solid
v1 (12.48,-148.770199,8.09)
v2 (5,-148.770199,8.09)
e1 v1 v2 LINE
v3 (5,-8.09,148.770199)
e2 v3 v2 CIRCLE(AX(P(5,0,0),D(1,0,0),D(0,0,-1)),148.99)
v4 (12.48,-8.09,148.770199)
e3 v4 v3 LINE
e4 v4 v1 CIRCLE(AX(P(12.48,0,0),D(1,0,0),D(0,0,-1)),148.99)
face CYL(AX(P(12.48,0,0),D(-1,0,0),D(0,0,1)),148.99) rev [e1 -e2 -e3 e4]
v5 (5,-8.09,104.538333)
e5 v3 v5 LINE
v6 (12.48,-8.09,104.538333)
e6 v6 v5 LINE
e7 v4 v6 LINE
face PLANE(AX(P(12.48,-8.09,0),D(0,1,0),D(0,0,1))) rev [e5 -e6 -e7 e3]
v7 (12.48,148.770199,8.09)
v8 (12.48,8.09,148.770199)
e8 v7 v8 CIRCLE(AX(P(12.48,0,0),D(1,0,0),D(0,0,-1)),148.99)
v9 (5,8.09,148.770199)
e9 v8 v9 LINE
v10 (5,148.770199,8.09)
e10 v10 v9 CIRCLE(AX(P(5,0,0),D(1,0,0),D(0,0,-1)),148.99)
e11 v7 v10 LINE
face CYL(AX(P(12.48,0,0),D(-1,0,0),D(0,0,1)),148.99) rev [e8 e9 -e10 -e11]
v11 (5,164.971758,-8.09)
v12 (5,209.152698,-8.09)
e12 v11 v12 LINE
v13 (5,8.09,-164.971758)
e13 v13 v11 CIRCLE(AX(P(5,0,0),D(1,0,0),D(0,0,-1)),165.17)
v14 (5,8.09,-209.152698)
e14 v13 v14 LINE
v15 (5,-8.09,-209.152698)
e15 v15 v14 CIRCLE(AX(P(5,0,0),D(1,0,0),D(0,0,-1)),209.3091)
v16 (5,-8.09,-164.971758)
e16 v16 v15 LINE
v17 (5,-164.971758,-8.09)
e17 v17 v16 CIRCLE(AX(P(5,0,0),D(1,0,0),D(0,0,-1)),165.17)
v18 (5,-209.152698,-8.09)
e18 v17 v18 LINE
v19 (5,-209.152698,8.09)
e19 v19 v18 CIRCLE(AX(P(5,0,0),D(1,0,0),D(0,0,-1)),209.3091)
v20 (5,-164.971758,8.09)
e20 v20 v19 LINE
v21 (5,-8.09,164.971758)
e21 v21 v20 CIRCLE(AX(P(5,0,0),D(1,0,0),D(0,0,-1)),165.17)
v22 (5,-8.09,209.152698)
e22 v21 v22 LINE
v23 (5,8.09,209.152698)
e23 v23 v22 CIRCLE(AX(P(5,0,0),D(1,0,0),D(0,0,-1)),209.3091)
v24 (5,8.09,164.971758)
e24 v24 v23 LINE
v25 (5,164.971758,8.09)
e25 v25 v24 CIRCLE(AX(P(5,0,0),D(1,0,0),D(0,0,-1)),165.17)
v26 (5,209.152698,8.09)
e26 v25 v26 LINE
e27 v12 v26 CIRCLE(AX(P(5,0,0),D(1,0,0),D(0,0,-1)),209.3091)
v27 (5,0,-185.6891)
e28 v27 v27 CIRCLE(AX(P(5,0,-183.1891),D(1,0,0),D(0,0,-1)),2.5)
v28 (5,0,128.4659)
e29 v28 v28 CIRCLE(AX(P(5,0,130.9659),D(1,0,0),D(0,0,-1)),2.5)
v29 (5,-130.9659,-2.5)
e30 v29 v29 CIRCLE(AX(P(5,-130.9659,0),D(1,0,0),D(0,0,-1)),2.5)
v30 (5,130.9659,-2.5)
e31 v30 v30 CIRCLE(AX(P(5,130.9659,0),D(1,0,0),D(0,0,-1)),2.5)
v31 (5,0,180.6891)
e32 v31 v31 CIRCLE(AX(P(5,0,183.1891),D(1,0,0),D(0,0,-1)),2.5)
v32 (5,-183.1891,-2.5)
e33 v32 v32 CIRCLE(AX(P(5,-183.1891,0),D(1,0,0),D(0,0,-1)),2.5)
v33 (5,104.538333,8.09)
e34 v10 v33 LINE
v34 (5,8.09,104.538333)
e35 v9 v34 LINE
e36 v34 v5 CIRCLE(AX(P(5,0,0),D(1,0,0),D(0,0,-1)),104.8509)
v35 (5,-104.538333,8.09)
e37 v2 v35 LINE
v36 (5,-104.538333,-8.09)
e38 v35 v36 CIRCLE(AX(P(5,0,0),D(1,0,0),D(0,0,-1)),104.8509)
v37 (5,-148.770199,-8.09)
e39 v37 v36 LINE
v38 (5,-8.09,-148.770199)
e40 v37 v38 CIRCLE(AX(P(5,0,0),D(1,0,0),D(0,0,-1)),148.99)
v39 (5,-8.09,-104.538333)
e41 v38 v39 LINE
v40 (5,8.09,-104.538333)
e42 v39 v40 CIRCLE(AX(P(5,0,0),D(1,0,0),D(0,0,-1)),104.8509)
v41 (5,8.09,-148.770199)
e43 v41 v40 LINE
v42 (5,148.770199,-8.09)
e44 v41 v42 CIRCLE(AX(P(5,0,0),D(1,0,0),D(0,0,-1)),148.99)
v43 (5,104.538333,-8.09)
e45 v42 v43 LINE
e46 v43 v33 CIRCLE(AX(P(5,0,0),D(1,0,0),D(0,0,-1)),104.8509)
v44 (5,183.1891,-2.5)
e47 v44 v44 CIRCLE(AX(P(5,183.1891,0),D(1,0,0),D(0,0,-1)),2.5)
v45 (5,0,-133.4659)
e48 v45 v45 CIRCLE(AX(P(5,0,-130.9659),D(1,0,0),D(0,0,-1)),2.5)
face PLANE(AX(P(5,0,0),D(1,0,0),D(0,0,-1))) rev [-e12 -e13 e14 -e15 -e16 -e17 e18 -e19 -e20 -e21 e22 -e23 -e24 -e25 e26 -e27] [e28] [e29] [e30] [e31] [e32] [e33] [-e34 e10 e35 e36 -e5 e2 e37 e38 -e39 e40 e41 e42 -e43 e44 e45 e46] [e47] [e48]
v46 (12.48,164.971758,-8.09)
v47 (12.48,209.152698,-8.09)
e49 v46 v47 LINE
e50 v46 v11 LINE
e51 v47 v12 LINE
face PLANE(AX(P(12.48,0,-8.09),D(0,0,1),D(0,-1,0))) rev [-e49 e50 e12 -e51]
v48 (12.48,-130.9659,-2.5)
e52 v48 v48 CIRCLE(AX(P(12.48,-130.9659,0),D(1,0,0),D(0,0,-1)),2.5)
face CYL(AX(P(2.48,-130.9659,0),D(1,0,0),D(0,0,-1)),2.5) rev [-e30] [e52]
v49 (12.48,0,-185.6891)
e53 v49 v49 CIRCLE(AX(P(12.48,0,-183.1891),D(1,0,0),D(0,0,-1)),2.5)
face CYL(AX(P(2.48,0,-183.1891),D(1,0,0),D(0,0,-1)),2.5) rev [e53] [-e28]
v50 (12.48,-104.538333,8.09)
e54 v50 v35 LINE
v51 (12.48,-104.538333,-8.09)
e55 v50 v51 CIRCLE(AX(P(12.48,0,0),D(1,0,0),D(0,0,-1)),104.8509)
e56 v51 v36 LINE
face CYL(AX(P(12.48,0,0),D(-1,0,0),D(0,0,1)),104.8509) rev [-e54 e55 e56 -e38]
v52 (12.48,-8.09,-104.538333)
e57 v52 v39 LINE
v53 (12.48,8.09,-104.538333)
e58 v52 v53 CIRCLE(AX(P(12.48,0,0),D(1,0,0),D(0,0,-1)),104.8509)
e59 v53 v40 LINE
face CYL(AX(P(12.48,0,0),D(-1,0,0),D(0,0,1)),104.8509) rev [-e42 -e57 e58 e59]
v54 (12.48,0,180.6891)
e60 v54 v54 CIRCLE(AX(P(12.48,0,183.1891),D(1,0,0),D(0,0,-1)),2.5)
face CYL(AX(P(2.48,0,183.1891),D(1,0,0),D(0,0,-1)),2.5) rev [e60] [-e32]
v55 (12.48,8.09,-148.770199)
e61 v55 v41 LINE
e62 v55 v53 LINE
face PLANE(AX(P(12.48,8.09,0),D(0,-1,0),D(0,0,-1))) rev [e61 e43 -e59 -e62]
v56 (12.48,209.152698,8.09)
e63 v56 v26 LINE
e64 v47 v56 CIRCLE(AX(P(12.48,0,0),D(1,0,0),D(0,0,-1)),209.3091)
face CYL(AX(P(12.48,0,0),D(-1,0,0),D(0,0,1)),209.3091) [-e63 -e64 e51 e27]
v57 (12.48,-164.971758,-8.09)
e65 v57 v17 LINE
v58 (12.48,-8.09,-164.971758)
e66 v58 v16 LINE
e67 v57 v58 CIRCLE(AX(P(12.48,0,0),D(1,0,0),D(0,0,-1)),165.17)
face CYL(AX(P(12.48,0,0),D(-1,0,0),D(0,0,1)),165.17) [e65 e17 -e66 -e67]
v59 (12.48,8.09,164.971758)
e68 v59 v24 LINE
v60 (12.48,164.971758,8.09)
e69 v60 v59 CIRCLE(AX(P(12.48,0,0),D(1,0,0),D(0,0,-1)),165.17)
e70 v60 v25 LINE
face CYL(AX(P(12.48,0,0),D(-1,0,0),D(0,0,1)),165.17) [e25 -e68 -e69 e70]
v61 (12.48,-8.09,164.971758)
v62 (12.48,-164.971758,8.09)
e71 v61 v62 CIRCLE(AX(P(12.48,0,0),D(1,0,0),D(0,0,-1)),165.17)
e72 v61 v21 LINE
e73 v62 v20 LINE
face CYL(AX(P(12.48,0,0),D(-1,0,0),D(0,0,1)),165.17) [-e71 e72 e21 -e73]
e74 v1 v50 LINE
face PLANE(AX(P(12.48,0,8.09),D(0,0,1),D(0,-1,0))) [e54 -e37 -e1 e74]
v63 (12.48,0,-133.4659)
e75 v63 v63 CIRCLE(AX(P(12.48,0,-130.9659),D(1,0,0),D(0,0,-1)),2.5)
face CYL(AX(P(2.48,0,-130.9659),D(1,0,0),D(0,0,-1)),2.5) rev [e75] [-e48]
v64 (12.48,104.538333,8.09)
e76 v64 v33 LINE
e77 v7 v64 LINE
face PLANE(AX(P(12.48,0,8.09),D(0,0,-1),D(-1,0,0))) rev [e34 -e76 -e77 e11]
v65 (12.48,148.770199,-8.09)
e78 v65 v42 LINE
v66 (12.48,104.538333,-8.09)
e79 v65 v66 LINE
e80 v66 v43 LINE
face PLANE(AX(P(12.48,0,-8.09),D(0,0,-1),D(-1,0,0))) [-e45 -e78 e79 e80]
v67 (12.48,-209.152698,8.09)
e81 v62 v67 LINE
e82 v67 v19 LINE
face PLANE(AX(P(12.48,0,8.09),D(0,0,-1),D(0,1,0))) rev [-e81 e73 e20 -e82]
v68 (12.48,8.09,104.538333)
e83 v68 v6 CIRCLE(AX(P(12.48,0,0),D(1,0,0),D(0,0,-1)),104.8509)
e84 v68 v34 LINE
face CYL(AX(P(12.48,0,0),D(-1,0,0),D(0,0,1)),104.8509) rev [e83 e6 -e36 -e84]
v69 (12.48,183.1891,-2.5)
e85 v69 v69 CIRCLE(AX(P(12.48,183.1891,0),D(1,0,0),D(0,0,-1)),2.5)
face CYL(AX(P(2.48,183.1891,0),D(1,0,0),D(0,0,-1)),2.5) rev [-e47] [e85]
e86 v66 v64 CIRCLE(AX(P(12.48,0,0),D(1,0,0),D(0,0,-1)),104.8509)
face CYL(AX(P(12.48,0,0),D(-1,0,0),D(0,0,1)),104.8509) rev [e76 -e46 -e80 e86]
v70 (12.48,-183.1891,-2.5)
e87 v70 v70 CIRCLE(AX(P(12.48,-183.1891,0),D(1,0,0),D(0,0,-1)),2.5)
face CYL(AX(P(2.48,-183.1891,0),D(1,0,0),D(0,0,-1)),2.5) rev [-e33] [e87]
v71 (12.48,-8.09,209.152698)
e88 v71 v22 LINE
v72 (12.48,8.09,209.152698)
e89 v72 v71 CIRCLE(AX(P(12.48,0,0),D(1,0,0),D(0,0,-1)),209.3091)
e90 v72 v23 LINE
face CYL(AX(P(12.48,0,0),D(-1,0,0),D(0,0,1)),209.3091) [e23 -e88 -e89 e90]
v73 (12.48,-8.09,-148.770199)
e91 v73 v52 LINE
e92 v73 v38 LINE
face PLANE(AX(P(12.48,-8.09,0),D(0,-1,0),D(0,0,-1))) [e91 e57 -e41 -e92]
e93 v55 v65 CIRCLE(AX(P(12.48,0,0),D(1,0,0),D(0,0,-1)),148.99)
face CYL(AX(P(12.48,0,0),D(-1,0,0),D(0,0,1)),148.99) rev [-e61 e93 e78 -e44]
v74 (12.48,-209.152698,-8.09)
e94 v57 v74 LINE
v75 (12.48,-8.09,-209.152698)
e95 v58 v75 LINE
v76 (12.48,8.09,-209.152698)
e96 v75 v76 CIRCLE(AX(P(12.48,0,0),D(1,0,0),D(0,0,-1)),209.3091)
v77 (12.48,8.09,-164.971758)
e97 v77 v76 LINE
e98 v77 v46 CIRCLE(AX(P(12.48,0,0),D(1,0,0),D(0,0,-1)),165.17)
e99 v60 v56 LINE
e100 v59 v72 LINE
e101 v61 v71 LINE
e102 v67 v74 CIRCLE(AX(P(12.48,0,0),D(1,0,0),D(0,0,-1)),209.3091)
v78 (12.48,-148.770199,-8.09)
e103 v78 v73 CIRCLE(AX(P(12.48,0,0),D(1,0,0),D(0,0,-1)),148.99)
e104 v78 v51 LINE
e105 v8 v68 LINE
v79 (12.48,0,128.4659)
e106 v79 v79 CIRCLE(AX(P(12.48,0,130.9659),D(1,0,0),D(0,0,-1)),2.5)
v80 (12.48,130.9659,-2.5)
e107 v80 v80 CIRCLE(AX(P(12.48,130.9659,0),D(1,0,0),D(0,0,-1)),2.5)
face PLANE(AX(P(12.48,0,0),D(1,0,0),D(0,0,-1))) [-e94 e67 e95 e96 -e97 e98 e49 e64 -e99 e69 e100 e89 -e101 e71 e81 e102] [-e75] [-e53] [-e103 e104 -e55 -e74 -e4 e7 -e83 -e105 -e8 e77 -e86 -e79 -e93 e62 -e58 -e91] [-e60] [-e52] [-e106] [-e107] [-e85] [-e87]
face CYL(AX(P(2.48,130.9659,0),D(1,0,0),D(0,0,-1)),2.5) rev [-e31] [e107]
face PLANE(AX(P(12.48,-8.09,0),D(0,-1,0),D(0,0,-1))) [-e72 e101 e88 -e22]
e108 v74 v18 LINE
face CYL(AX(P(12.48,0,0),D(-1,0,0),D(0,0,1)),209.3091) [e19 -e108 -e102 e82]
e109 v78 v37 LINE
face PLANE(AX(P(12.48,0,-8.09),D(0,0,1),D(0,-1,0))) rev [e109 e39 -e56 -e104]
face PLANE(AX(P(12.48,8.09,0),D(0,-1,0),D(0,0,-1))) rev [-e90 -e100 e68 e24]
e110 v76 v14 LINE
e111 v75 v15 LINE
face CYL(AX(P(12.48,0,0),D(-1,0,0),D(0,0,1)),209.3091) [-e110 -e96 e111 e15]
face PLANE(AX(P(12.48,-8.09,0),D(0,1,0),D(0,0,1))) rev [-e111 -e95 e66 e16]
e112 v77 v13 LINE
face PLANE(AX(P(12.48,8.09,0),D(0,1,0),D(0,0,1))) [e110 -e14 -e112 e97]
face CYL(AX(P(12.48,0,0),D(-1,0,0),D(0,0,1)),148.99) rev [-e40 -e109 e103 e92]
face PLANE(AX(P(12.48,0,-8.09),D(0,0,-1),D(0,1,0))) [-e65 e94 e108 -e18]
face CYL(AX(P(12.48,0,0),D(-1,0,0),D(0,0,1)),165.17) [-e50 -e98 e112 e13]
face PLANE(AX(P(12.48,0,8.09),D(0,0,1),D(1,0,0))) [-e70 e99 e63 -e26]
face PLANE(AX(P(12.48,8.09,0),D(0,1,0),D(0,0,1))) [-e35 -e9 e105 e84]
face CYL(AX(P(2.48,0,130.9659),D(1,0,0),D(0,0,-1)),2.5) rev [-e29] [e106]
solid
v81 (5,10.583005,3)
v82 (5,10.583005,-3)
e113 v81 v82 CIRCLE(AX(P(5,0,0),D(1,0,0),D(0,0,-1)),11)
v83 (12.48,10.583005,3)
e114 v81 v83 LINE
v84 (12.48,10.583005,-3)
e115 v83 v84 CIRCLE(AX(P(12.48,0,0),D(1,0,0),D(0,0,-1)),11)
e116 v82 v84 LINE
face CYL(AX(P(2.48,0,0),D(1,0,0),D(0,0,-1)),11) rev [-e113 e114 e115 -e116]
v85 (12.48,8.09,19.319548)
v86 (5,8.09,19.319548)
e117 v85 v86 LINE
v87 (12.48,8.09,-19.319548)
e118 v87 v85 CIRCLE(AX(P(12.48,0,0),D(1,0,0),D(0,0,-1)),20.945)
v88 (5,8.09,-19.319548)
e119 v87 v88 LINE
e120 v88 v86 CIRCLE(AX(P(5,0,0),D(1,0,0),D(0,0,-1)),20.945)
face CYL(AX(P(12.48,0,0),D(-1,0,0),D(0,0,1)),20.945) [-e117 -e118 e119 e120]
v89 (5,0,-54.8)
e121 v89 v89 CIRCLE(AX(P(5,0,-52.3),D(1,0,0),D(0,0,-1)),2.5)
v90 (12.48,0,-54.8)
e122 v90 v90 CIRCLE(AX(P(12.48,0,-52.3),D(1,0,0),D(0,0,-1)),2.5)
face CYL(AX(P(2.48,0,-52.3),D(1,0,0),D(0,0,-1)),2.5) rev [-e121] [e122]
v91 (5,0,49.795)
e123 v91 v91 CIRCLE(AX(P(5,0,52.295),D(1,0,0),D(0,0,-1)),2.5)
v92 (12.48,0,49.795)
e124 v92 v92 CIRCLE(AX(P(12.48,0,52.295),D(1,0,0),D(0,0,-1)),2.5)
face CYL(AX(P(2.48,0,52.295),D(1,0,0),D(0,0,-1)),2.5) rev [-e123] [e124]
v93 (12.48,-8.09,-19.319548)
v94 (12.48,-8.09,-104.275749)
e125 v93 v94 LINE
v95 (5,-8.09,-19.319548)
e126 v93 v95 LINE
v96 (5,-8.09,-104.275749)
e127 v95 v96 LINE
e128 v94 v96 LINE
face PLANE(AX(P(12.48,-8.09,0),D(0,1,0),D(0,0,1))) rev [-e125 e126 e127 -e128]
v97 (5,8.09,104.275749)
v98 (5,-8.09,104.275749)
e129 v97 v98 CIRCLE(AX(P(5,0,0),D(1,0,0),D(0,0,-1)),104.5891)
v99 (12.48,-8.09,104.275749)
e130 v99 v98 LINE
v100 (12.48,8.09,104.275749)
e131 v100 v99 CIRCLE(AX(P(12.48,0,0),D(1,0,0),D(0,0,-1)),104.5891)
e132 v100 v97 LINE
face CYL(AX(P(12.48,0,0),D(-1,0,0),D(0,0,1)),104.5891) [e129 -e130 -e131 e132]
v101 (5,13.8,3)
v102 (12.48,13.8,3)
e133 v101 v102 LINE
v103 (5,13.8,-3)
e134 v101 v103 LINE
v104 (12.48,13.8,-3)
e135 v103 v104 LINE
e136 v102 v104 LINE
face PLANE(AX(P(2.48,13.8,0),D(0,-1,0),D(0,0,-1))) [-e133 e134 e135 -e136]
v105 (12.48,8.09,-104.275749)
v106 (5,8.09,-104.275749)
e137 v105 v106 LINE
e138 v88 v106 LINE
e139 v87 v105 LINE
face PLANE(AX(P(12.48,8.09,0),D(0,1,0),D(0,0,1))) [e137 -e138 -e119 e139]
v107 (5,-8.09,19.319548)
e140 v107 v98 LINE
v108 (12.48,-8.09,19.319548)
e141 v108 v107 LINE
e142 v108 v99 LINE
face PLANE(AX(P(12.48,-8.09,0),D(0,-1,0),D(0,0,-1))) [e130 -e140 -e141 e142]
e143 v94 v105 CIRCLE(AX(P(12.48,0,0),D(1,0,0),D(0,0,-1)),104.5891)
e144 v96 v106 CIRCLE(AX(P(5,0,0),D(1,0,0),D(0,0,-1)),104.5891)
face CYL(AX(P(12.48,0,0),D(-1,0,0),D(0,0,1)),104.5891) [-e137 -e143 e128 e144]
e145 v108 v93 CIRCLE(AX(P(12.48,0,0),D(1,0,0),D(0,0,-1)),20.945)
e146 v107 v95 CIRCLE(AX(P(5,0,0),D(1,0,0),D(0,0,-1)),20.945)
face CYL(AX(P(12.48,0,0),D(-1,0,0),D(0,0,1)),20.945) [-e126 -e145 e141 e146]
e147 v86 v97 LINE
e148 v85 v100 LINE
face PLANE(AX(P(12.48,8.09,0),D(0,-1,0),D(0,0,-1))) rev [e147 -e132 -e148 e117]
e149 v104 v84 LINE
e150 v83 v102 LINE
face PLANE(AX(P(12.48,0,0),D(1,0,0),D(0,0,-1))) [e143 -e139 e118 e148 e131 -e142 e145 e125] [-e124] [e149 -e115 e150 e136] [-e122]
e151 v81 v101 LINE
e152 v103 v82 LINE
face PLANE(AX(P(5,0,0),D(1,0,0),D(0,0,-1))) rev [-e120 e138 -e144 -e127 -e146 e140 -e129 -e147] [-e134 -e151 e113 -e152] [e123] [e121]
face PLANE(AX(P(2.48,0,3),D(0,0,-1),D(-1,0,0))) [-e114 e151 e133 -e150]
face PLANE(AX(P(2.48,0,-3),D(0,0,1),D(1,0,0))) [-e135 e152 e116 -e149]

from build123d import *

# Parameters (mm, degrees)
SKETCH1_W           = 450
SKETCH1_H           = 450
BOSS_EXTRUDE1_DEPTH = 5
BOSS_EXTRUDE2_DEPTH = 7.48
BOSS_EXTRUDE3_DEPTH = 7.48
SKETCH6_W           = 450
SKETCH6_H           = 450
CUT_EXTRUDE1_DEPTH  = 5
SKETCH7_R           = 11
SKETCH7_R_2         = 2.5
CUT_EXTRUDE2_DEPTH  = 10


# Read off the part's stored shape, not the designer's step: Boss-Extrude2
with BuildPart() as part:
    # Sketch1 → Boss-Extrude1 (new body)
    with BuildSketch(Plane(origin=(0, 0, 0), x_dir=(0, 0, -1), z_dir=(1, 0, 0))):
        Rectangle(SKETCH1_W, SKETCH1_H)
    extrude(amount=BOSS_EXTRUDE1_DEPTH)

    # Boss-Extrude2 outline → Boss-Extrude2 (add)
    with BuildSketch(Plane(origin=(5, 0, 0), x_dir=(0, 0, -1), z_dir=(1, 0, 0))):
        with BuildLine():
            Line((-164.971757583, 8.09), (-209.152698388, 8.09))
            ThreePointArc((-209.152698388, 8.09), (-209.3091, 0), (-209.152698388, -8.09))
            Line((-209.152698388, -8.09), (-164.971757583, -8.09))
            ThreePointArc((-164.971757583, -8.09), (-116.792827049, -116.792827049), (-8.09, -164.971757583))
            Line((-8.09, -164.971757583), (-8.09, -209.152698388))
            ThreePointArc((-8.09, -209.152698388), (0, -209.3091), (8.09, -209.152698388))
            Line((8.09, -209.152698388), (8.09, -164.971757583))
            ThreePointArc((8.09, -164.971757583), (116.792827049, -116.792827049), (164.971757583, -8.09))
            Line((164.971757583, -8.09), (209.152698388, -8.09))
            ThreePointArc((209.152698388, -8.09), (209.3091, 0), (209.152698388, 8.09))
            Line((209.152698388, 8.09), (164.971757583, 8.09))
            ThreePointArc((164.971757583, 8.09), (116.792827049, 116.792827049), (8.09, 164.971757583))
            Line((8.09, 164.971757583), (8.09, 209.152698388))
            ThreePointArc((8.09, 209.152698388), (0, 209.3091), (-8.09, 209.152698388))
            Line((-8.09, 209.152698388), (-8.09, 164.971757583))
            ThreePointArc((-8.09, 164.971757583), (-116.792827049, 116.792827049), (-164.971757583, 8.09))
        make_face()
        with BuildLine():
            Line((148.770198629, 8.09), (104.538333308, 8.09))
            ThreePointArc((104.538333308, 8.09), (104.8509, 0), (104.538333308, -8.09))
            Line((104.538333308, -8.09), (148.770198629, -8.09))
            ThreePointArc((148.770198629, -8.09), (105.351839329, -105.351839329), (8.09, -148.770198629))
            Line((8.09, -148.770198629), (8.09, -104.538333308))
            ThreePointArc((8.09, -104.538333308), (0, -104.8509), (-8.09, -104.538333308))
            Line((-8.09, -104.538333308), (-8.09, -148.770198629))
            ThreePointArc((-8.09, -148.770198629), (-105.351839329, -105.351839329), (-148.770198629, -8.09))
            Line((-148.770198629, -8.09), (-104.538333308, -8.09))
            ThreePointArc((-104.538333308, -8.09), (-104.8509, 0), (-104.538333308, 8.09))
            Line((-104.538333308, 8.09), (-148.770198629, 8.09))
            ThreePointArc((-148.770198629, 8.09), (-105.351839329, 105.351839329), (-8.09, 148.770198629))
            Line((-8.09, 148.770198629), (-8.09, 104.538333308))
            ThreePointArc((-8.09, 104.538333308), (0, 104.8509), (8.09, 104.538333308))
            Line((8.09, 104.538333308), (8.09, 148.770198629))
            ThreePointArc((8.09, 148.770198629), (105.351839329, 105.351839329), (148.770198629, 8.09))
        make_face(mode=Mode.SUBTRACT)
    extrude(amount=BOSS_EXTRUDE2_DEPTH)

    # Sketch5 → Boss-Extrude3 (add)
    with BuildSketch(Plane(origin=(5, 0, 0), x_dir=(0, 0, -1), z_dir=(1, 0, 0))):
        with BuildLine():
            Line((-19.319547743, 8.09), (-104.275748565, 8.09))
            ThreePointArc((-104.275748565, 8.09), (-104.5891, 0), (-104.275748565, -8.09))
            Line((-104.275748565, -8.09), (-19.319547743, -8.09))
            ThreePointArc((-19.319547743, -8.09), (0, -20.945), (19.319547743, -8.09))
            Line((19.319547743, -8.09), (104.275748565, -8.09))
            ThreePointArc((104.275748565, -8.09), (104.5891, 0), (104.275748565, 8.09))
            Line((104.275748565, 8.09), (19.319547743, 8.09))
            ThreePointArc((19.319547743, 8.09), (0, 20.945), (-19.319547743, 8.09))
        make_face()
    extrude(amount=BOSS_EXTRUDE3_DEPTH)

    # Sketch6 → Cut-Extrude1 (cut)
    with BuildSketch(Plane.ZY):
        Rectangle(SKETCH6_W, SKETCH6_H)
    extrude(amount=-CUT_EXTRUDE1_DEPTH, mode=Mode.SUBTRACT)


with BuildPart() as cut_extrude1_piece_1:
    # of the separate pieces the step leaves, piece 1, a body of its own (cut_extrude1_pieces)
    add(part.part.solids().sort_by_distance((5, 209.152698388, 8.09))[0])


with BuildPart() as cut_extrude1_piece_2:
    # of the separate pieces the step leaves, piece 2, a body of its own (cut_extrude1_pieces)
    add(part.part.solids().sort_by_distance((5, 8.09, -104.275748565))[0])


with BuildPart() as cut_extrude2_tool:
    # Sketch7 → Cut-Extrude2 (new body)
    with BuildSketch(Plane(origin=(12.48, 0, 0), x_dir=(0, 0, -1), z_dir=(1, 0, 0))):
        Circle(SKETCH7_R)
        with Locations((-183.1891, 0)):
            Circle(SKETCH7_R_2)
        with Locations((-130.9659, 0)):
            Circle(SKETCH7_R_2)
        with Locations((0, -183.1891)):
            Circle(SKETCH7_R_2)
        with Locations((0, -130.9659)):
            Circle(SKETCH7_R_2)
        with Locations((183.1891, 0)):
            Circle(SKETCH7_R_2)
        with Locations((52.3, 0)):
            Circle(SKETCH7_R_2)
        with Locations((-52.295, 0)):
            Circle(SKETCH7_R_2)
        with Locations((0, 183.1891)):
            Circle(SKETCH7_R_2)
        with Locations((0, 130.9659)):
            Circle(SKETCH7_R_2)
        with BuildLine():
            Line((-3, 13.8), (-3, 10.583005244))
            ThreePointArc((-3, 10.583005244), (0, 11), (3, 10.583005244))
            Line((3, 10.583005244), (3, 13.8))
            Line((3, 13.8), (-3, 13.8))
        make_face()
        with Locations((130.9659, 0)):
            Circle(SKETCH7_R_2)
    extrude(amount=-CUT_EXTRUDE2_DEPTH)


with BuildPart() as cut_extrude1_piece_1_1:
    add(cut_extrude1_piece_1.part)

    # Cut-Extrude2: cut by cut_extrude2_tool
    add(cut_extrude2_tool.part, mode=Mode.SUBTRACT)


with BuildPart() as cut_extrude1_piece_2_1:
    add(cut_extrude1_piece_2.part)

    # Cut-Extrude2: cut by cut_extrude2_tool
    add(cut_extrude2_tool.part, mode=Mode.SUBTRACT)


solid = Compound([cut_extrude1_piece_1_1.part, cut_extrude1_piece_2_1.part])
